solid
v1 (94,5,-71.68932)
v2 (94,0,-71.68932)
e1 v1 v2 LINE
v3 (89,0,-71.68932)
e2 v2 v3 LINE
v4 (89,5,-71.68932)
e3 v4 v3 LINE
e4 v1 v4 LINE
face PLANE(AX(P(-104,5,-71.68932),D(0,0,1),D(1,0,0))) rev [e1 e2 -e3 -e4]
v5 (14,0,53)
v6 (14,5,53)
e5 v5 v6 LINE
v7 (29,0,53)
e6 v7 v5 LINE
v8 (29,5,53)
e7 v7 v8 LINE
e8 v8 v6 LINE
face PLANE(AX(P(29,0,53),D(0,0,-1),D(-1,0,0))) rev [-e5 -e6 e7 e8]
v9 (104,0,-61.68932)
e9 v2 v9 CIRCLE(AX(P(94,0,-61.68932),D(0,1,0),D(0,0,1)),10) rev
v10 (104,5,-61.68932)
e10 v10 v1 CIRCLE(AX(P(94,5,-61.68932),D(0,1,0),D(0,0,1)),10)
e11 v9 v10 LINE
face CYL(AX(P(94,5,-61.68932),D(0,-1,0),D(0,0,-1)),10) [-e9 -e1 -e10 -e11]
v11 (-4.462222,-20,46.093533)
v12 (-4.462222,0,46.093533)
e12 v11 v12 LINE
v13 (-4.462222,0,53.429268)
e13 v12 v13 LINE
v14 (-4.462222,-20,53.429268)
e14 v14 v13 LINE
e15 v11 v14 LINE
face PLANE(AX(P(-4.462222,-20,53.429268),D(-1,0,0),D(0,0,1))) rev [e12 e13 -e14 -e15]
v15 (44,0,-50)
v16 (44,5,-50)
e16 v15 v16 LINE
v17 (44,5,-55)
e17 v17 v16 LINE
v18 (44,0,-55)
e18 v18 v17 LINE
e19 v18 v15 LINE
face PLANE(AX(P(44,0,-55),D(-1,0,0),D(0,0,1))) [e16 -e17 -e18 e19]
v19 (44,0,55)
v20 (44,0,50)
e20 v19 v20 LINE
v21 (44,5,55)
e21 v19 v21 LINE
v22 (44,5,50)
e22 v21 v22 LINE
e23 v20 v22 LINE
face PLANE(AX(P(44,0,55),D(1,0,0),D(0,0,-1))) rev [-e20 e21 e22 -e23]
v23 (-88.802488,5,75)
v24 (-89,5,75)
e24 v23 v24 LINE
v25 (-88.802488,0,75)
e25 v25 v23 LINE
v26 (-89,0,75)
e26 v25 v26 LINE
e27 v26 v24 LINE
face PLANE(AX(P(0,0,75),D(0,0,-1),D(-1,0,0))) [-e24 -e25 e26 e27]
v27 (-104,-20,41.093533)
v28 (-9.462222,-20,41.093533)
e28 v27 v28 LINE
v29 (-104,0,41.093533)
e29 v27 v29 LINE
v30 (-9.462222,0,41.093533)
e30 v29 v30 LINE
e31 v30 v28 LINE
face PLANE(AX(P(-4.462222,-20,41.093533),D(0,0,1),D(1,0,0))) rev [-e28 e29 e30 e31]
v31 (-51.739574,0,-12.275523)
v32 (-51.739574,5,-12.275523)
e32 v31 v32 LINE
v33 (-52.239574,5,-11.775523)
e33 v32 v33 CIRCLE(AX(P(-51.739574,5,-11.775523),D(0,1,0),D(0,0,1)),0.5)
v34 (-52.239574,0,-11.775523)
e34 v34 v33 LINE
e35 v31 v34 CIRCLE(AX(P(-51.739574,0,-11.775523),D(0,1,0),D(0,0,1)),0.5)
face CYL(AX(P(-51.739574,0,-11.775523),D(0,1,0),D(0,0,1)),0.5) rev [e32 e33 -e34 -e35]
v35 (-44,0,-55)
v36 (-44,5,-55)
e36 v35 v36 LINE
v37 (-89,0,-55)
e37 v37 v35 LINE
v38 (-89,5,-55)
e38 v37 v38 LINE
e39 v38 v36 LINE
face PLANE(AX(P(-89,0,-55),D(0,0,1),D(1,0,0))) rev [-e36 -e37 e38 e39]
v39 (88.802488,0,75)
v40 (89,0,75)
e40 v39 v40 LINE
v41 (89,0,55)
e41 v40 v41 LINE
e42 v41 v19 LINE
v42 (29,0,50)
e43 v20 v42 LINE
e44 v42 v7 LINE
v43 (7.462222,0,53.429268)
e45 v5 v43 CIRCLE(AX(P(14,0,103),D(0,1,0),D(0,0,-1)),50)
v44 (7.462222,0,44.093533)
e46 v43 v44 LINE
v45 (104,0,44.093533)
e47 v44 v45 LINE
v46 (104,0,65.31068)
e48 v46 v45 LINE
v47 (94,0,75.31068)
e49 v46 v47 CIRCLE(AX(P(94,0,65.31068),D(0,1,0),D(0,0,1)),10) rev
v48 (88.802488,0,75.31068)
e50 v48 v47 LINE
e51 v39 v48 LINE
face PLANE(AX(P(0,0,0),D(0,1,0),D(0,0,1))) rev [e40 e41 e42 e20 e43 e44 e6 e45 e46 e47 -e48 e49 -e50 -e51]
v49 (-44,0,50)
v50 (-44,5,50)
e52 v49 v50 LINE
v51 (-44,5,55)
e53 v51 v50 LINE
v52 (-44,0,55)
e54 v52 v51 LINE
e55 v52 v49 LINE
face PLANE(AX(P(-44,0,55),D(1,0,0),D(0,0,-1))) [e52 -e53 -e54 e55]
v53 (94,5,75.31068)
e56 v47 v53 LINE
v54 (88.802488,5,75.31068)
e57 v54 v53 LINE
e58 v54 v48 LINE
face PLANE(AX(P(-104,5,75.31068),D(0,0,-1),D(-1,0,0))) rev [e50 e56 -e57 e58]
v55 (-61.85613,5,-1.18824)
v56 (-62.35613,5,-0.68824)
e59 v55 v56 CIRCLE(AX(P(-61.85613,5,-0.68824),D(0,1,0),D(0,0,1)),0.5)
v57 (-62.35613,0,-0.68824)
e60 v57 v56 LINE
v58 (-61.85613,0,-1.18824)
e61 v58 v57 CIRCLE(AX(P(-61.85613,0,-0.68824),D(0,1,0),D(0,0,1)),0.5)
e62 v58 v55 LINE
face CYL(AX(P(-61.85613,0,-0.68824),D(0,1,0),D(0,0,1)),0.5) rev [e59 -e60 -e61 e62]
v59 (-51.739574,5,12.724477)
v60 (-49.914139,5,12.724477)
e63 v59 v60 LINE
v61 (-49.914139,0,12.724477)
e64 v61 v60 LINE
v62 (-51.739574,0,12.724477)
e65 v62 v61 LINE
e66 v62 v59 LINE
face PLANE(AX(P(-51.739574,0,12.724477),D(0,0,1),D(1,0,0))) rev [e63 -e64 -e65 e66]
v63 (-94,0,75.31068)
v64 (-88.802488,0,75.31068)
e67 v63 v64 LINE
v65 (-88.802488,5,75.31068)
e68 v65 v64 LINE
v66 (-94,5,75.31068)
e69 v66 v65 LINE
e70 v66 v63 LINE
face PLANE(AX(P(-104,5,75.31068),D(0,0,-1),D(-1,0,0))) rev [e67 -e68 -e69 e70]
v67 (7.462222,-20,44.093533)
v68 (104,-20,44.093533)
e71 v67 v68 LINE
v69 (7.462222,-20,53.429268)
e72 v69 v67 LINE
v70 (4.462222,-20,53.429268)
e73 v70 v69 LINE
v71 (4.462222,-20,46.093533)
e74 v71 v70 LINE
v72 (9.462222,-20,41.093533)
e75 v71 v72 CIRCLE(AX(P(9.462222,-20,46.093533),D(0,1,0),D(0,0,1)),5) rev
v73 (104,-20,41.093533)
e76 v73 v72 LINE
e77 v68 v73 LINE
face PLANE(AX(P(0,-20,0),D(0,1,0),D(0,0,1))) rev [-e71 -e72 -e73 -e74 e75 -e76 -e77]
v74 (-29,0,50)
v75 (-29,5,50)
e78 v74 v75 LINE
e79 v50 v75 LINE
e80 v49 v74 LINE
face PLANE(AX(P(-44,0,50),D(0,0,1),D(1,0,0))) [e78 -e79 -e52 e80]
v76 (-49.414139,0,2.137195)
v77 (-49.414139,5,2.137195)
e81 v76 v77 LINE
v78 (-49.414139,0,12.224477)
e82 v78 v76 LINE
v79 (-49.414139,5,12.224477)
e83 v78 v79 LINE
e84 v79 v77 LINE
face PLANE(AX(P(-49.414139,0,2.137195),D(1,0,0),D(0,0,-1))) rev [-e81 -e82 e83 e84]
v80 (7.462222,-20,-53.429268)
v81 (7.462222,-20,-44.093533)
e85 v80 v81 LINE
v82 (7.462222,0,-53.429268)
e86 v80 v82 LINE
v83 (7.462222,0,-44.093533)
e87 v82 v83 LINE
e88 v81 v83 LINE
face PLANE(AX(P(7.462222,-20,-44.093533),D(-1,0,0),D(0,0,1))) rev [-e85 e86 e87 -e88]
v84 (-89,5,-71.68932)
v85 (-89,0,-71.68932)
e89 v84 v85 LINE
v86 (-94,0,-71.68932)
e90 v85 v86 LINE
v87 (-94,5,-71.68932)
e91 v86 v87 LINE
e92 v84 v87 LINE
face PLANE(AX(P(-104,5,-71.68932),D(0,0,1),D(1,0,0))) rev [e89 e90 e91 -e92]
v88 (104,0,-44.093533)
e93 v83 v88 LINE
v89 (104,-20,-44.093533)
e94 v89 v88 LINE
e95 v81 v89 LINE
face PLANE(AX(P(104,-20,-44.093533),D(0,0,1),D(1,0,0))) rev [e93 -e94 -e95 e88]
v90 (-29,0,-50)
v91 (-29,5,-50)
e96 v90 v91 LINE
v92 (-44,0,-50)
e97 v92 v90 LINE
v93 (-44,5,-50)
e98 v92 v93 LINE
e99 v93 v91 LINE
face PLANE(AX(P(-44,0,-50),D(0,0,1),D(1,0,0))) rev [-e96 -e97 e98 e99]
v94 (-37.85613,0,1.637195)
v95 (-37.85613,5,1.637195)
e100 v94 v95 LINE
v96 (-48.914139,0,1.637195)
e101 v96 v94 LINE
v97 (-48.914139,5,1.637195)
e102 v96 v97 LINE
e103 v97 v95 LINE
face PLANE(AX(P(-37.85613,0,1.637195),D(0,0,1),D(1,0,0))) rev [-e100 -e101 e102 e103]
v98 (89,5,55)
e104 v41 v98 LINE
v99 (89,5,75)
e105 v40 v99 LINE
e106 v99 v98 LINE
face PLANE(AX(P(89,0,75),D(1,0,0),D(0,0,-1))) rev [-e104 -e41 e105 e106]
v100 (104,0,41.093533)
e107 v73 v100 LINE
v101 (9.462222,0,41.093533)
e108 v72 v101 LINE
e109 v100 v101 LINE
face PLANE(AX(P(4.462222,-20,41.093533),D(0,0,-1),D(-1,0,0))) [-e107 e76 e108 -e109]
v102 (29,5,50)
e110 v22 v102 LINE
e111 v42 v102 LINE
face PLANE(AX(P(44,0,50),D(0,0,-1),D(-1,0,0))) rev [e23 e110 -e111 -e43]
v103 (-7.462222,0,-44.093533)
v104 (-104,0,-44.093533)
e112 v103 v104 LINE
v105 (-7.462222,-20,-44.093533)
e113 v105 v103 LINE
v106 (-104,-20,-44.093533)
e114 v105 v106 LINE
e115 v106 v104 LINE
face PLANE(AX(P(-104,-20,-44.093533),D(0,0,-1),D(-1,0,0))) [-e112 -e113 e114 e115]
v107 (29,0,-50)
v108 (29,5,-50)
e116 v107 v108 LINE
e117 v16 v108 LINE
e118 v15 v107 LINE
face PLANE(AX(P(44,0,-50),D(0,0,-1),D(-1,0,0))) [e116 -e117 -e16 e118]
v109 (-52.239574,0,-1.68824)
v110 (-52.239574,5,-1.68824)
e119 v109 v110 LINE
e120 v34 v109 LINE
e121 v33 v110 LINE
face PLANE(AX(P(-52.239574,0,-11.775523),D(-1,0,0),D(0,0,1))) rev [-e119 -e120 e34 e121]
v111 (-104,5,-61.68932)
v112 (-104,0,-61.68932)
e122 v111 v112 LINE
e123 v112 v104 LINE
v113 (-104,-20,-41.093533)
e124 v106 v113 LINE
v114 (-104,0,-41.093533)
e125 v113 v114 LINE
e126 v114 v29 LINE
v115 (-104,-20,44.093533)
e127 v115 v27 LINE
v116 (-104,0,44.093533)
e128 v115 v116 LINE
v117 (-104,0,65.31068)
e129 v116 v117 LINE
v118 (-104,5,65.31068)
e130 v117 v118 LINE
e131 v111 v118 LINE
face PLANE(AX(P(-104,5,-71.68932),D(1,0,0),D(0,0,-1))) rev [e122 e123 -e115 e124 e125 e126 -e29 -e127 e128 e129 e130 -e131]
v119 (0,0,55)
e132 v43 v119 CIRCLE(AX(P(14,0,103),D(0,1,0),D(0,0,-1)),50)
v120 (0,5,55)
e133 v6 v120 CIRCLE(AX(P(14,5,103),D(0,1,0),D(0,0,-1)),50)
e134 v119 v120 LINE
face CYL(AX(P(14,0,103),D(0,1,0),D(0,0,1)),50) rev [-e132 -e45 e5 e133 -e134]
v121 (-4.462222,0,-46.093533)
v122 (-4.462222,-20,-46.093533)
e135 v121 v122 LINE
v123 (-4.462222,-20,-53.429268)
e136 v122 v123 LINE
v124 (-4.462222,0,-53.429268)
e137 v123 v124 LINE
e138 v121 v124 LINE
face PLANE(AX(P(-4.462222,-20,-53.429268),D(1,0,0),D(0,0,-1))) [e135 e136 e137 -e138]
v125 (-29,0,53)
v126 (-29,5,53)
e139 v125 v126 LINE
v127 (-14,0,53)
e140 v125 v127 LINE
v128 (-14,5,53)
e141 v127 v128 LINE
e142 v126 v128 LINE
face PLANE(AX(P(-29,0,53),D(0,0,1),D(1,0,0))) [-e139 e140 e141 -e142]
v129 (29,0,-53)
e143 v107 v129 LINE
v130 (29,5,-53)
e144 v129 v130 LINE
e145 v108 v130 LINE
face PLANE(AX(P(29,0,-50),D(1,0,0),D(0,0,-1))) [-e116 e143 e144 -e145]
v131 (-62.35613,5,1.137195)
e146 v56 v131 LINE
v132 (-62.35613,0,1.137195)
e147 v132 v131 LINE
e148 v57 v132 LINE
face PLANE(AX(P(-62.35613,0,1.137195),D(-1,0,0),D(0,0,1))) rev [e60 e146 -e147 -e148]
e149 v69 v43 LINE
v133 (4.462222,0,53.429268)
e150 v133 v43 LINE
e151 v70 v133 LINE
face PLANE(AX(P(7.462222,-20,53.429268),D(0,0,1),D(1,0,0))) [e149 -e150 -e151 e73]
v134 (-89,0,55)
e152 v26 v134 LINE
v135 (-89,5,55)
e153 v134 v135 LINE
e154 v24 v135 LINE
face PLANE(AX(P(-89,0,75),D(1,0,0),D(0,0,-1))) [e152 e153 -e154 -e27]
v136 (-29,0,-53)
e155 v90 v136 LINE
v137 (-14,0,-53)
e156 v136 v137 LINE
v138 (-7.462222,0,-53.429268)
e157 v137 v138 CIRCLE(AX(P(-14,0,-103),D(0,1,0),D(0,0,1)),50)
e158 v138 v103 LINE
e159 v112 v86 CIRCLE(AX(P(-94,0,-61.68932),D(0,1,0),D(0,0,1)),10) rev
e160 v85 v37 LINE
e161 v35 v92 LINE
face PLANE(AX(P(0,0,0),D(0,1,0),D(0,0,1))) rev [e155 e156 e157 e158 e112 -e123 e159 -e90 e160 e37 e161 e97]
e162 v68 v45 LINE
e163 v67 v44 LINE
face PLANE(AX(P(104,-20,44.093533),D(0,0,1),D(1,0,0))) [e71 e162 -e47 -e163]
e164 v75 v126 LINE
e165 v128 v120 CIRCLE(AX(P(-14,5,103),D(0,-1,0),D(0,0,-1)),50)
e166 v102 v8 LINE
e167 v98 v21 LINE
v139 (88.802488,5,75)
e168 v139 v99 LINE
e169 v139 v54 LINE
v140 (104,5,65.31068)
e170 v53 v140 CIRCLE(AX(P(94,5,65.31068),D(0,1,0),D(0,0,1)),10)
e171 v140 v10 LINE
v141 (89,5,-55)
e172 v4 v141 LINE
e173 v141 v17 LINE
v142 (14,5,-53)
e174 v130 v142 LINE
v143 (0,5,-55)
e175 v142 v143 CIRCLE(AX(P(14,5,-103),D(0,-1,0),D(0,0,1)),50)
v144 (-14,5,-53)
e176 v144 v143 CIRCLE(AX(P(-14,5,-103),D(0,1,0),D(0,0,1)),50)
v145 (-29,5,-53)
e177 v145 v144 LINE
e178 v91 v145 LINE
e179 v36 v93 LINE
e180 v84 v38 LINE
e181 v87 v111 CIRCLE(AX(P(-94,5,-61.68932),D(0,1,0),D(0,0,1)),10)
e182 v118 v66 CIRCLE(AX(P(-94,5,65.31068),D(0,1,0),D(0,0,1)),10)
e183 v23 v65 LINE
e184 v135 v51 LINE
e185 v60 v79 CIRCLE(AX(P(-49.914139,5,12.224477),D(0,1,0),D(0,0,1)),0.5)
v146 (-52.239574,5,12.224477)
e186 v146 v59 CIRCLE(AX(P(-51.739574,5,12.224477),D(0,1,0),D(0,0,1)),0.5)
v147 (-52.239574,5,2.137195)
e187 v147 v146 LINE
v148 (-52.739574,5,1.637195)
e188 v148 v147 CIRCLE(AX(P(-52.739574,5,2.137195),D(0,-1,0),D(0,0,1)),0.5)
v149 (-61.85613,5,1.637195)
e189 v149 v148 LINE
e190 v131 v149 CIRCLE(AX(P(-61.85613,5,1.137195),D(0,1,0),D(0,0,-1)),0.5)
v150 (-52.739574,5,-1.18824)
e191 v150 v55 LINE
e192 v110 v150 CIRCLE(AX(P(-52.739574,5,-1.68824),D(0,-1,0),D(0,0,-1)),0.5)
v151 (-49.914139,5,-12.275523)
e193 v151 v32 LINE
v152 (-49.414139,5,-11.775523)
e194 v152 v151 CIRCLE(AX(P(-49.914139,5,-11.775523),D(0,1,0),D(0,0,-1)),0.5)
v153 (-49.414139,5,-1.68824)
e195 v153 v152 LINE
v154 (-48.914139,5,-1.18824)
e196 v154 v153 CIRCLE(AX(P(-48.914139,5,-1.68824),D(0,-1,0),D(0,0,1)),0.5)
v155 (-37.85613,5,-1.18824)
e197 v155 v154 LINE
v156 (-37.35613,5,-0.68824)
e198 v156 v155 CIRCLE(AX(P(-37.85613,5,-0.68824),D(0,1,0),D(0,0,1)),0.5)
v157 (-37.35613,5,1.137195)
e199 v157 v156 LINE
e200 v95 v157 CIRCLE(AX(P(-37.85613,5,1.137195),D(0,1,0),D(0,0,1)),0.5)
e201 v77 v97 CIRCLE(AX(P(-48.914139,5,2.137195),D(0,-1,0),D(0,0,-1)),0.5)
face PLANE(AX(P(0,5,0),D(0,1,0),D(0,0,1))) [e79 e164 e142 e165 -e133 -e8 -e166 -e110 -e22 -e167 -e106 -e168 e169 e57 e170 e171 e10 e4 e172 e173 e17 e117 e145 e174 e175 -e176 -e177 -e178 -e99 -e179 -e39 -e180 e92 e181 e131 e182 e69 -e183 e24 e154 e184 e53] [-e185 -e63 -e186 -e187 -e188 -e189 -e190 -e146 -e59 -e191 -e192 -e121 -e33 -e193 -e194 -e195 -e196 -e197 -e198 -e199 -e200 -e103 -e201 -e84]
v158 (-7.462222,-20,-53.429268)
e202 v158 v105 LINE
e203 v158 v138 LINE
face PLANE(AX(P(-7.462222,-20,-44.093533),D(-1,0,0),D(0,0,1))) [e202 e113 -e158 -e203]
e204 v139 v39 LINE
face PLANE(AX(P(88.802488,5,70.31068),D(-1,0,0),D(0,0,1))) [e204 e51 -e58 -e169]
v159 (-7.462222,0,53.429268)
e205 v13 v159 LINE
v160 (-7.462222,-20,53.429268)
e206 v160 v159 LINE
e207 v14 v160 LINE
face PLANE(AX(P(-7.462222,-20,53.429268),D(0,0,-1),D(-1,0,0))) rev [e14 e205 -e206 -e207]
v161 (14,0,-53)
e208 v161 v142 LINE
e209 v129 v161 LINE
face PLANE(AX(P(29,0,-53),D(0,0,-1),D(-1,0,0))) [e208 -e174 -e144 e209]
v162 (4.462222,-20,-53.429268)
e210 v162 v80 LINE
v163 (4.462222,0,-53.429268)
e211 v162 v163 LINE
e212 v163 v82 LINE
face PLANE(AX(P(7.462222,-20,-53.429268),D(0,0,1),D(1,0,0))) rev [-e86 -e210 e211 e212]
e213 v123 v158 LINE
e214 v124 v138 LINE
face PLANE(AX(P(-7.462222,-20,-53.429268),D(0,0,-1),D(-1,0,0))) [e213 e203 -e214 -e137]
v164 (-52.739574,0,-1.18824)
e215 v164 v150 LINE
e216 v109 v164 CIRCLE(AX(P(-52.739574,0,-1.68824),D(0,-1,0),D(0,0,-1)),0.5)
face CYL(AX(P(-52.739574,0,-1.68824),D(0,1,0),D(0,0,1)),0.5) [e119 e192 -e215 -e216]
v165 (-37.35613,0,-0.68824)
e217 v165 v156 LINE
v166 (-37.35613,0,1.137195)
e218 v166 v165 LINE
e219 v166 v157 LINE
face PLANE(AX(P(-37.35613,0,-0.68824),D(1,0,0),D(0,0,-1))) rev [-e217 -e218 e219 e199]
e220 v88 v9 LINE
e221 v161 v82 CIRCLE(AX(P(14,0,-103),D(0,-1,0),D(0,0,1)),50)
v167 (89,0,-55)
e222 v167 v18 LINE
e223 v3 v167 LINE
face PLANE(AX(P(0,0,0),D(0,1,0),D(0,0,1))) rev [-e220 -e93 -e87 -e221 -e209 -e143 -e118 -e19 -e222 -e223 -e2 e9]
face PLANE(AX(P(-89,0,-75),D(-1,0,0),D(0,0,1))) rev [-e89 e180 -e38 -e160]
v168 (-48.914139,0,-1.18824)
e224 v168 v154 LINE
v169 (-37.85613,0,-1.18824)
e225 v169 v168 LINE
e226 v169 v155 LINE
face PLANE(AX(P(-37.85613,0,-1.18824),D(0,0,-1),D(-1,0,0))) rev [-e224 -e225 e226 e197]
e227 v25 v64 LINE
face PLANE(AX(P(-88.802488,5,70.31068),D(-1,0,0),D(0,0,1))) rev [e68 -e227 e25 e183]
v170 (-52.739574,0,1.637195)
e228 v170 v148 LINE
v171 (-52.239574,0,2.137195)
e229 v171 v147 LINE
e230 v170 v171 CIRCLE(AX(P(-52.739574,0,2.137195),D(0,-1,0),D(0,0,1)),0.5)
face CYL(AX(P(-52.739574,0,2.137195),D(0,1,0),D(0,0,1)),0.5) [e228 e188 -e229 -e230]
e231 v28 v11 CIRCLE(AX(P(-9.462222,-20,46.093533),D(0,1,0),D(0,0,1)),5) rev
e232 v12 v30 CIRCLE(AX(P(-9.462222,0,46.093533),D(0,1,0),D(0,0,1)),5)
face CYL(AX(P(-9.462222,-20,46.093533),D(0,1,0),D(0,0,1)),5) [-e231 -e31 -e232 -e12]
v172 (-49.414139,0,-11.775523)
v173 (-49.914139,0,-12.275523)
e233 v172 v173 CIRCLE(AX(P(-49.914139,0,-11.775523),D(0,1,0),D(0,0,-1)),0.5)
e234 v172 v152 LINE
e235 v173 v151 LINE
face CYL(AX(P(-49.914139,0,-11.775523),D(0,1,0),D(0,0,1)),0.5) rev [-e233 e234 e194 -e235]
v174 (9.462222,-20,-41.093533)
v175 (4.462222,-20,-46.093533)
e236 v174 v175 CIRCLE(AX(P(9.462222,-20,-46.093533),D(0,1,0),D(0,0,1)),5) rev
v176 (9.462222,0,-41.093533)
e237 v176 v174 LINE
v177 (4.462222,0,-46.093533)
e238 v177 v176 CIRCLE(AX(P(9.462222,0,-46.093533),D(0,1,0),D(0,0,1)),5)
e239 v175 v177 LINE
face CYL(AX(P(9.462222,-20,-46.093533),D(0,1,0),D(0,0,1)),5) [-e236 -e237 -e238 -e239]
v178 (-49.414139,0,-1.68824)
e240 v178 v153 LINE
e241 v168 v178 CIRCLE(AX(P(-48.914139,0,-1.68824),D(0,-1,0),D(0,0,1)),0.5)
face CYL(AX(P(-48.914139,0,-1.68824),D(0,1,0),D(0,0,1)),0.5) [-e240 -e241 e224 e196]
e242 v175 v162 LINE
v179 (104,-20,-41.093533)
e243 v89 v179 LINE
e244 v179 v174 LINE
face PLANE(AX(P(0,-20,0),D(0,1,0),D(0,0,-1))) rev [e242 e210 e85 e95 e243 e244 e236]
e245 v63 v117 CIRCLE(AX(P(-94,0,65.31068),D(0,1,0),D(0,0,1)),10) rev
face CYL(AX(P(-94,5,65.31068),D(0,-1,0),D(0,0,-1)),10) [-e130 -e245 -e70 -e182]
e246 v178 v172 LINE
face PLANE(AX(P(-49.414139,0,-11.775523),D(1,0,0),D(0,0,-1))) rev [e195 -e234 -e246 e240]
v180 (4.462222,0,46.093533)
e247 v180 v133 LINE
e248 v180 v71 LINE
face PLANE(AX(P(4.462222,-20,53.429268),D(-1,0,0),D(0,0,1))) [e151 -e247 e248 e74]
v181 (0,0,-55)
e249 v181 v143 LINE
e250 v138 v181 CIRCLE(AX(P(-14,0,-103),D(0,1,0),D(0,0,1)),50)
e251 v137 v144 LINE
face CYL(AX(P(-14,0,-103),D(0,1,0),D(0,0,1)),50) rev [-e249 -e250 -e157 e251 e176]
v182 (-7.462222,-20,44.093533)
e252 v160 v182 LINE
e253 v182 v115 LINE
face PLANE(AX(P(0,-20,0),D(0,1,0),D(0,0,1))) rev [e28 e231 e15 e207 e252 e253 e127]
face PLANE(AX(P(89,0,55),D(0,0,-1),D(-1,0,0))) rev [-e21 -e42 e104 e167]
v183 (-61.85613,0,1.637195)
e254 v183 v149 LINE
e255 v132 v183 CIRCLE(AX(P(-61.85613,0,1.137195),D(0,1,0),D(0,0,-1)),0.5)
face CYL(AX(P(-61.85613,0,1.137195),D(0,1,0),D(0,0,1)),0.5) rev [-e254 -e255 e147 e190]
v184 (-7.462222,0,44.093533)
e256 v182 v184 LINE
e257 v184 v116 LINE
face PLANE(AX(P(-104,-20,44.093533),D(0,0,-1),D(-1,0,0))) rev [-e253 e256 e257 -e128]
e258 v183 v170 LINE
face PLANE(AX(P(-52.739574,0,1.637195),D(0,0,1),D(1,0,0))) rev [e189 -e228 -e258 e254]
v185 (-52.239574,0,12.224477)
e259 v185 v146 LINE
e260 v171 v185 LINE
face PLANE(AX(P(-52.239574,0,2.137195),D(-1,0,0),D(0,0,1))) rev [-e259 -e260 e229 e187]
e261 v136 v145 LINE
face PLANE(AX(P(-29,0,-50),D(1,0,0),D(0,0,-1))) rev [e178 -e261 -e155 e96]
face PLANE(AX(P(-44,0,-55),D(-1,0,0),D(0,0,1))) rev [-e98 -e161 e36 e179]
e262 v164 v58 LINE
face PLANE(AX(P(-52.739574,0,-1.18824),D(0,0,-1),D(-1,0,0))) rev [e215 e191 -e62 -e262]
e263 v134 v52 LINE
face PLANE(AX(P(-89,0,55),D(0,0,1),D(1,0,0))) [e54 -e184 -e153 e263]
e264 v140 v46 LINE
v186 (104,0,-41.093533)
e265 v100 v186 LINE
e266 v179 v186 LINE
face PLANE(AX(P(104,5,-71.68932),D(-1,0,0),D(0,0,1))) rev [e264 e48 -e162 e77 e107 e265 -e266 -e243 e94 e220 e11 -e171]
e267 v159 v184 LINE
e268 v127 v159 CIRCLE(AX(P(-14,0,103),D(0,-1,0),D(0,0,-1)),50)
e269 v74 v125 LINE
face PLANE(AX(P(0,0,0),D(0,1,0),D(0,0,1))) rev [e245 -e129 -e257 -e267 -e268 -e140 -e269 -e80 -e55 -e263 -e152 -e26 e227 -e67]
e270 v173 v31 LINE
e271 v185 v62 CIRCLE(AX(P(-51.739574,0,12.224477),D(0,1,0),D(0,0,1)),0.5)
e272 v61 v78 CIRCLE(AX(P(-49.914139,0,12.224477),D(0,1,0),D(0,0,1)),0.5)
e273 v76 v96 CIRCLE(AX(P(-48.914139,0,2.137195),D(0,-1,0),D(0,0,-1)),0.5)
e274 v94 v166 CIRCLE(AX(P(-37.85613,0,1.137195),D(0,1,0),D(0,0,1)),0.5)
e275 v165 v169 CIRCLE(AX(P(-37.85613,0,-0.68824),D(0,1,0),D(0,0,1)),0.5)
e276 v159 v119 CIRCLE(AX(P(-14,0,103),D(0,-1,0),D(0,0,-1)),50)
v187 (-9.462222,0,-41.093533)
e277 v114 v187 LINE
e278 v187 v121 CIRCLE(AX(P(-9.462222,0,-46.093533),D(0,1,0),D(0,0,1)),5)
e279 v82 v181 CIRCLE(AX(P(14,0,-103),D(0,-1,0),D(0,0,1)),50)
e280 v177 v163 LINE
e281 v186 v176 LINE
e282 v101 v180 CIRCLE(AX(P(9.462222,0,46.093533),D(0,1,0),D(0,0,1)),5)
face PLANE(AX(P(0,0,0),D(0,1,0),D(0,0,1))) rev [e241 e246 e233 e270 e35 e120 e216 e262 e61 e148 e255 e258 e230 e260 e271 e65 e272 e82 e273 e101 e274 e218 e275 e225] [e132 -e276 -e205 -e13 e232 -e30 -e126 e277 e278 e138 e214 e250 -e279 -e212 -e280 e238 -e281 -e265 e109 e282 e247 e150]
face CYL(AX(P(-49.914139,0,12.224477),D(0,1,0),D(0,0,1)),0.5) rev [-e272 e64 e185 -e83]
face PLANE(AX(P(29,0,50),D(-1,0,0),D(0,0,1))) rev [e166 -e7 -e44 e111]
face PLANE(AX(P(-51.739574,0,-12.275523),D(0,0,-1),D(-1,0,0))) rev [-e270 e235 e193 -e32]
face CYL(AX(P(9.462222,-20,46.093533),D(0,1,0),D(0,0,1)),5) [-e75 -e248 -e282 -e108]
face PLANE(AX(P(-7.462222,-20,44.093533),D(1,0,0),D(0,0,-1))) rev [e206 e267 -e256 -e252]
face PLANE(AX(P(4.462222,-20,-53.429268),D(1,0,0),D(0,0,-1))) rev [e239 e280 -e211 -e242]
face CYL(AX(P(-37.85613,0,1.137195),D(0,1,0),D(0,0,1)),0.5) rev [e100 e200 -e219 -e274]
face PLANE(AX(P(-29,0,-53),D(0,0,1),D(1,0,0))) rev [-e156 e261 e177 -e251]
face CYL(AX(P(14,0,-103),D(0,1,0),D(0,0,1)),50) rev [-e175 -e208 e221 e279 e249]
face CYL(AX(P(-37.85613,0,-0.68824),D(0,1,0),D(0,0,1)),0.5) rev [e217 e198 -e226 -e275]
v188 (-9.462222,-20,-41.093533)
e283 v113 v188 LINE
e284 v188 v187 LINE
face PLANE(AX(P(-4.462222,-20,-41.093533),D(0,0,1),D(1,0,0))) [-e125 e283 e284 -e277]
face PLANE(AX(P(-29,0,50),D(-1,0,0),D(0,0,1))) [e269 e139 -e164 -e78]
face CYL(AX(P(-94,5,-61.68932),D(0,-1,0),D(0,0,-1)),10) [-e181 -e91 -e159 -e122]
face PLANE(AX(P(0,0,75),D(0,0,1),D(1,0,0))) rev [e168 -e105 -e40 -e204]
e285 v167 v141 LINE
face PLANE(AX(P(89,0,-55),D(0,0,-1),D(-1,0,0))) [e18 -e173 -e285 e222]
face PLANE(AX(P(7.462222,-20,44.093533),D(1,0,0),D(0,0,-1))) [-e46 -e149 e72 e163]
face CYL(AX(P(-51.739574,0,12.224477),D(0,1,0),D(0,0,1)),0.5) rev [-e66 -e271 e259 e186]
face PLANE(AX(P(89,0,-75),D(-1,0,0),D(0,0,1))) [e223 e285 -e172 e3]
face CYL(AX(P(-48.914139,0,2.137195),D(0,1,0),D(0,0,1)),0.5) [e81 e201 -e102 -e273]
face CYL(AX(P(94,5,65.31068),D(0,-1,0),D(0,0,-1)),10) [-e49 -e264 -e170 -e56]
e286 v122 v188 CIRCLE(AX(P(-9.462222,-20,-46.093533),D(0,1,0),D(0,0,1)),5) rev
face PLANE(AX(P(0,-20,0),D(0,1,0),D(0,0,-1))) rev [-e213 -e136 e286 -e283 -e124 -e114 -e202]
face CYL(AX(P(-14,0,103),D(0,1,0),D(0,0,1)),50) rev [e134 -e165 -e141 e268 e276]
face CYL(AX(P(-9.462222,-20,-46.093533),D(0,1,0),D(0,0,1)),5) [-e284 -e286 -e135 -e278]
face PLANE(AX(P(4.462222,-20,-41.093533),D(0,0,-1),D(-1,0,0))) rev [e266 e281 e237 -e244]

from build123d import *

# Parameters (mm, degrees)
SKETCH1_W            = 208
SKETCH1_H            = 147
BOSS_EXTRUDE1_DEPTH  = 5
CUT_EXTRUDE1_DEPTH   = 129.501744983
SKETCH3_W            = 88.802487793
SKETCH3_H            = 5
CUT_EXTRUDE2_DEPTH   = 5
MIRROR3_COPY_1_DEPTH = 129.501744983
FILLET1_R            = 10
CUT_EXTRUDE3_DEPTH   = 129.501744983
BOSS_EXTRUDE2_DEPTH  = 20
FILLET2_R            = 5
FILLET2_OF_MIRROR4_R = 5
MIRROR5_START        = -20
MIRROR5_DEPTH        = 20


# Read off the part's stored shape, not the designer's step: Mirror5
with BuildPart() as part:
    # Sketch1 → Boss-Extrude1 (new body)
    with BuildSketch(Plane(origin=(0, 0, 0), x_dir=(1, 0, 0), z_dir=(0, 1, 0))):
        with Locations((0, -1.810679612)):
            Rectangle(SKETCH1_W, SKETCH1_H)
    extrude(amount=BOSS_EXTRUDE1_DEPTH)

    # Sketch2 → Cut-Extrude1 (cut, through all)
    with BuildSketch(Plane(origin=(0, 5, 0), x_dir=(1, 0, 0), z_dir=(0, 1, 0))):
        with BuildLine():
            Line((-89, 75), (-89, 55))
            Line((-89, 55), (-44, 55))
            Line((-44, 55), (-44, 50))
            Line((-44, 50), (-29, 50))
            Line((-29, 50), (-29, 53))
            Line((-29, 53), (-14, 53))
            ThreePointArc((-14, 53), (-6.928932188, 53.502525317), (0, 55))
            Line((0, 55), (0, 75))
            Line((0, 75), (-89, 75))
        make_face()
    cut_extrude1 = extrude(amount=-CUT_EXTRUDE1_DEPTH, mode=Mode.SUBTRACT)

    # Mirror1: Cut-Extrude1 across plane
    add(cut_extrude1.mirror(Plane.XY), mode=Mode.SUBTRACT)

    # Sketch3 → Cut-Extrude2 (cut)
    with BuildSketch(Plane.XY.offset(75.310679612)):
        with Locations((-44.401243897, 2.5)):
            Rectangle(SKETCH3_W, SKETCH3_H)
    cut_extrude2 = extrude(amount=-CUT_EXTRUDE2_DEPTH, mode=Mode.SUBTRACT)

    # Mirror3: Cut-Extrude1, Cut-Extrude2 across plane
    add(cut_extrude1.mirror(Plane(origin=(0, 0, 0), x_dir=(0, 0, 1), z_dir=(1, 0, 0))), mode=Mode.SUBTRACT)
    add(cut_extrude2.mirror(Plane(origin=(0, 0, 0), x_dir=(0, 0, 1), z_dir=(1, 0, 0))), mode=Mode.SUBTRACT)

    # Mirror3 copy 1 sketch → Mirror3 copy 1 (cut, through all)
    with BuildSketch(Plane(origin=(0, 5, 0), x_dir=(-1, 0, 0), z_dir=(0, 1, 0))):
        with BuildLine():
            Line((-89, 75), (-89, 55))
            Line((-89, 55), (-44, 55))
            Line((-44, 55), (-44, 50))
            Line((-44, 50), (-29, 50))
            Line((-29, 50), (-29, 53))
            Line((-29, 53), (-14, 53))
            ThreePointArc((-14, 53), (-6.928932188, 53.502525317), (0, 55))
            Line((0, 55), (0, 75))
            Line((0, 75), (-89, 75))
        make_face()
    extrude(amount=-MIRROR3_COPY_1_DEPTH, mode=Mode.SUBTRACT)

    # Fillet1
    fillet1_edges = [part.edges().sort_by_distance(p)[0] for p in [
        (104, 2.5, 75.310679612),
        (-104, 2.5, 75.310679612),
        (-104, 2.5, -71.689320388),
        (104, 2.5, -71.689320388),
    ]]
    fillet(fillet1_edges, radius=FILLET1_R)

    # Sketch4 → Cut-Extrude3 (cut, through all)
    with BuildSketch(Plane(origin=(0, 5, 0), x_dir=(1, 0, 0), z_dir=(0, 1, 0))):
        with BuildLine():
            Line((-52.239573725, -2.137194831), (-52.239573725, -12.224477428))
            ThreePointArc((-52.239573725, -12.224477428), (-52.093127116, -12.578030818), (-51.739573725, -12.724477428))
            Line((-51.739573725, -12.724477428), (-49.914138918, -12.724477428))
            ThreePointArc((-49.914138918, -12.724477428), (-49.560585528, -12.578030818), (-49.414138918, -12.224477428))
            Line((-49.414138918, -12.224477428), (-49.414138918, -2.137194831))
            ThreePointArc((-49.414138918, -2.137194831), (-49.267692309, -1.783641441), (-48.914138918, -1.637194831))
            Line((-48.914138918, -1.637194831), (-37.856129593, -1.637194831))
            ThreePointArc((-37.856129593, -1.637194831), (-37.502576202, -1.490748222), (-37.356129593, -1.137194831))
            Line((-37.356129593, -1.137194831), (-37.356129593, 0.688239976))
            ThreePointArc((-37.356129593, 0.688239976), (-37.502576202, 1.041793366), (-37.856129593, 1.188239976))
            Line((-37.856129593, 1.188239976), (-48.914138918, 1.188239976))
            ThreePointArc((-48.914138918, 1.188239976), (-49.267692309, 1.334686585), (-49.414138918, 1.688239976))
            Line((-49.414138918, 1.688239976), (-49.414138918, 11.775522572))
            ThreePointArc((-49.414138918, 11.775522572), (-49.560585528, 12.129075963), (-49.914138918, 12.275522572))
            Line((-49.914138918, 12.275522572), (-51.739573725, 12.275522572))
            ThreePointArc((-51.739573725, 12.275522572), (-52.093127116, 12.129075963), (-52.239573725, 11.775522572))
            Line((-52.239573725, 11.775522572), (-52.239573725, 1.688239976))
            ThreePointArc((-52.239573725, 1.688239976), (-52.386020335, 1.334686585), (-52.739573725, 1.188239976))
            Line((-52.739573725, 1.188239976), (-61.856129593, 1.188239976))
            ThreePointArc((-61.856129593, 1.188239976), (-62.209682983, 1.041793366), (-62.356129593, 0.688239976))
            Line((-62.356129593, 0.688239976), (-62.356129593, -1.137194831))
            ThreePointArc((-62.356129593, -1.137194831), (-62.209682983, -1.490748222), (-61.856129593, -1.637194831))
            Line((-61.856129593, -1.637194831), (-52.739573725, -1.637194831))
            ThreePointArc((-52.739573725, -1.637194831), (-52.386020335, -1.783641441), (-52.239573725, -2.137194831))
        make_face()
    extrude(amount=-CUT_EXTRUDE3_DEPTH, mode=Mode.SUBTRACT)

    # Sketch5 → Boss-Extrude2 (add)
    with BuildSketch(Plane.XZ):
        Polygon((-104, 44.093533077), (-7.462222255, 44.093533077), (-7.462222255, 53.429268089), (-4.462222255, 53.429268089), (-4.462222255, 41.093533077), (-104, 41.093533077), align=None)
    boss_extrude2 = extrude(amount=BOSS_EXTRUDE2_DEPTH)

    # Fillet2
    fillet2_edges = [part.edges().sort_by_distance(p)[0] for p in [
        (-4.462222255, -10, 41.093533077),
    ]]
    fillet(fillet2_edges, radius=FILLET2_R)

    # Mirror4: Boss-Extrude2 across plane
    add(boss_extrude2.mirror(Plane.XY))

    # Fillet2 of Mirror4
    fillet2_of_mirror4_edges = [part.edges().sort_by_distance(p)[0] for p in [
        (-4.462222255, -10, -41.093533077),
    ]]
    fillet(fillet2_of_mirror4_edges, radius=FILLET2_OF_MIRROR4_R)

    # Mirror5 outline → Mirror5 (add)
    with BuildSketch(Plane(origin=(0, 0, 0), x_dir=(1, 0, 0), z_dir=(0, 1, 0)).offset(MIRROR5_START)):
        with BuildLine():
            Line((104, -44.093533077), (104, -41.093533077))
            Line((104, -41.093533077), (9.462222255, -41.093533077))
            ThreePointArc((9.462222255, -41.093533077), (5.926688349, -42.557999171), (4.462222255, -46.093533077))
            Line((4.462222255, -46.093533077), (4.462222255, -53.429268089))
            Line((4.462222255, -53.429268089), (7.462222255, -53.429268089))
            Line((7.462222255, -53.429268089), (7.462222255, -44.093533077))
            Line((7.462222255, -44.093533077), (104, -44.093533077))
        make_face()
        with BuildLine():
            Line((9.462222255, 41.093533077), (104, 41.093533077))
            Line((104, 41.093533077), (104, 44.093533077))
            Line((104, 44.093533077), (7.462222255, 44.093533077))
            Line((7.462222255, 44.093533077), (7.462222255, 53.429268089))
            Line((7.462222255, 53.429268089), (4.462222255, 53.429268089))
            Line((4.462222255, 53.429268089), (4.462222255, 46.093533077))
            ThreePointArc((4.462222255, 46.093533077), (5.926688349, 42.557999171), (9.462222255, 41.093533077))
        make_face()
    extrude(amount=MIRROR5_DEPTH)


solid = part.part
